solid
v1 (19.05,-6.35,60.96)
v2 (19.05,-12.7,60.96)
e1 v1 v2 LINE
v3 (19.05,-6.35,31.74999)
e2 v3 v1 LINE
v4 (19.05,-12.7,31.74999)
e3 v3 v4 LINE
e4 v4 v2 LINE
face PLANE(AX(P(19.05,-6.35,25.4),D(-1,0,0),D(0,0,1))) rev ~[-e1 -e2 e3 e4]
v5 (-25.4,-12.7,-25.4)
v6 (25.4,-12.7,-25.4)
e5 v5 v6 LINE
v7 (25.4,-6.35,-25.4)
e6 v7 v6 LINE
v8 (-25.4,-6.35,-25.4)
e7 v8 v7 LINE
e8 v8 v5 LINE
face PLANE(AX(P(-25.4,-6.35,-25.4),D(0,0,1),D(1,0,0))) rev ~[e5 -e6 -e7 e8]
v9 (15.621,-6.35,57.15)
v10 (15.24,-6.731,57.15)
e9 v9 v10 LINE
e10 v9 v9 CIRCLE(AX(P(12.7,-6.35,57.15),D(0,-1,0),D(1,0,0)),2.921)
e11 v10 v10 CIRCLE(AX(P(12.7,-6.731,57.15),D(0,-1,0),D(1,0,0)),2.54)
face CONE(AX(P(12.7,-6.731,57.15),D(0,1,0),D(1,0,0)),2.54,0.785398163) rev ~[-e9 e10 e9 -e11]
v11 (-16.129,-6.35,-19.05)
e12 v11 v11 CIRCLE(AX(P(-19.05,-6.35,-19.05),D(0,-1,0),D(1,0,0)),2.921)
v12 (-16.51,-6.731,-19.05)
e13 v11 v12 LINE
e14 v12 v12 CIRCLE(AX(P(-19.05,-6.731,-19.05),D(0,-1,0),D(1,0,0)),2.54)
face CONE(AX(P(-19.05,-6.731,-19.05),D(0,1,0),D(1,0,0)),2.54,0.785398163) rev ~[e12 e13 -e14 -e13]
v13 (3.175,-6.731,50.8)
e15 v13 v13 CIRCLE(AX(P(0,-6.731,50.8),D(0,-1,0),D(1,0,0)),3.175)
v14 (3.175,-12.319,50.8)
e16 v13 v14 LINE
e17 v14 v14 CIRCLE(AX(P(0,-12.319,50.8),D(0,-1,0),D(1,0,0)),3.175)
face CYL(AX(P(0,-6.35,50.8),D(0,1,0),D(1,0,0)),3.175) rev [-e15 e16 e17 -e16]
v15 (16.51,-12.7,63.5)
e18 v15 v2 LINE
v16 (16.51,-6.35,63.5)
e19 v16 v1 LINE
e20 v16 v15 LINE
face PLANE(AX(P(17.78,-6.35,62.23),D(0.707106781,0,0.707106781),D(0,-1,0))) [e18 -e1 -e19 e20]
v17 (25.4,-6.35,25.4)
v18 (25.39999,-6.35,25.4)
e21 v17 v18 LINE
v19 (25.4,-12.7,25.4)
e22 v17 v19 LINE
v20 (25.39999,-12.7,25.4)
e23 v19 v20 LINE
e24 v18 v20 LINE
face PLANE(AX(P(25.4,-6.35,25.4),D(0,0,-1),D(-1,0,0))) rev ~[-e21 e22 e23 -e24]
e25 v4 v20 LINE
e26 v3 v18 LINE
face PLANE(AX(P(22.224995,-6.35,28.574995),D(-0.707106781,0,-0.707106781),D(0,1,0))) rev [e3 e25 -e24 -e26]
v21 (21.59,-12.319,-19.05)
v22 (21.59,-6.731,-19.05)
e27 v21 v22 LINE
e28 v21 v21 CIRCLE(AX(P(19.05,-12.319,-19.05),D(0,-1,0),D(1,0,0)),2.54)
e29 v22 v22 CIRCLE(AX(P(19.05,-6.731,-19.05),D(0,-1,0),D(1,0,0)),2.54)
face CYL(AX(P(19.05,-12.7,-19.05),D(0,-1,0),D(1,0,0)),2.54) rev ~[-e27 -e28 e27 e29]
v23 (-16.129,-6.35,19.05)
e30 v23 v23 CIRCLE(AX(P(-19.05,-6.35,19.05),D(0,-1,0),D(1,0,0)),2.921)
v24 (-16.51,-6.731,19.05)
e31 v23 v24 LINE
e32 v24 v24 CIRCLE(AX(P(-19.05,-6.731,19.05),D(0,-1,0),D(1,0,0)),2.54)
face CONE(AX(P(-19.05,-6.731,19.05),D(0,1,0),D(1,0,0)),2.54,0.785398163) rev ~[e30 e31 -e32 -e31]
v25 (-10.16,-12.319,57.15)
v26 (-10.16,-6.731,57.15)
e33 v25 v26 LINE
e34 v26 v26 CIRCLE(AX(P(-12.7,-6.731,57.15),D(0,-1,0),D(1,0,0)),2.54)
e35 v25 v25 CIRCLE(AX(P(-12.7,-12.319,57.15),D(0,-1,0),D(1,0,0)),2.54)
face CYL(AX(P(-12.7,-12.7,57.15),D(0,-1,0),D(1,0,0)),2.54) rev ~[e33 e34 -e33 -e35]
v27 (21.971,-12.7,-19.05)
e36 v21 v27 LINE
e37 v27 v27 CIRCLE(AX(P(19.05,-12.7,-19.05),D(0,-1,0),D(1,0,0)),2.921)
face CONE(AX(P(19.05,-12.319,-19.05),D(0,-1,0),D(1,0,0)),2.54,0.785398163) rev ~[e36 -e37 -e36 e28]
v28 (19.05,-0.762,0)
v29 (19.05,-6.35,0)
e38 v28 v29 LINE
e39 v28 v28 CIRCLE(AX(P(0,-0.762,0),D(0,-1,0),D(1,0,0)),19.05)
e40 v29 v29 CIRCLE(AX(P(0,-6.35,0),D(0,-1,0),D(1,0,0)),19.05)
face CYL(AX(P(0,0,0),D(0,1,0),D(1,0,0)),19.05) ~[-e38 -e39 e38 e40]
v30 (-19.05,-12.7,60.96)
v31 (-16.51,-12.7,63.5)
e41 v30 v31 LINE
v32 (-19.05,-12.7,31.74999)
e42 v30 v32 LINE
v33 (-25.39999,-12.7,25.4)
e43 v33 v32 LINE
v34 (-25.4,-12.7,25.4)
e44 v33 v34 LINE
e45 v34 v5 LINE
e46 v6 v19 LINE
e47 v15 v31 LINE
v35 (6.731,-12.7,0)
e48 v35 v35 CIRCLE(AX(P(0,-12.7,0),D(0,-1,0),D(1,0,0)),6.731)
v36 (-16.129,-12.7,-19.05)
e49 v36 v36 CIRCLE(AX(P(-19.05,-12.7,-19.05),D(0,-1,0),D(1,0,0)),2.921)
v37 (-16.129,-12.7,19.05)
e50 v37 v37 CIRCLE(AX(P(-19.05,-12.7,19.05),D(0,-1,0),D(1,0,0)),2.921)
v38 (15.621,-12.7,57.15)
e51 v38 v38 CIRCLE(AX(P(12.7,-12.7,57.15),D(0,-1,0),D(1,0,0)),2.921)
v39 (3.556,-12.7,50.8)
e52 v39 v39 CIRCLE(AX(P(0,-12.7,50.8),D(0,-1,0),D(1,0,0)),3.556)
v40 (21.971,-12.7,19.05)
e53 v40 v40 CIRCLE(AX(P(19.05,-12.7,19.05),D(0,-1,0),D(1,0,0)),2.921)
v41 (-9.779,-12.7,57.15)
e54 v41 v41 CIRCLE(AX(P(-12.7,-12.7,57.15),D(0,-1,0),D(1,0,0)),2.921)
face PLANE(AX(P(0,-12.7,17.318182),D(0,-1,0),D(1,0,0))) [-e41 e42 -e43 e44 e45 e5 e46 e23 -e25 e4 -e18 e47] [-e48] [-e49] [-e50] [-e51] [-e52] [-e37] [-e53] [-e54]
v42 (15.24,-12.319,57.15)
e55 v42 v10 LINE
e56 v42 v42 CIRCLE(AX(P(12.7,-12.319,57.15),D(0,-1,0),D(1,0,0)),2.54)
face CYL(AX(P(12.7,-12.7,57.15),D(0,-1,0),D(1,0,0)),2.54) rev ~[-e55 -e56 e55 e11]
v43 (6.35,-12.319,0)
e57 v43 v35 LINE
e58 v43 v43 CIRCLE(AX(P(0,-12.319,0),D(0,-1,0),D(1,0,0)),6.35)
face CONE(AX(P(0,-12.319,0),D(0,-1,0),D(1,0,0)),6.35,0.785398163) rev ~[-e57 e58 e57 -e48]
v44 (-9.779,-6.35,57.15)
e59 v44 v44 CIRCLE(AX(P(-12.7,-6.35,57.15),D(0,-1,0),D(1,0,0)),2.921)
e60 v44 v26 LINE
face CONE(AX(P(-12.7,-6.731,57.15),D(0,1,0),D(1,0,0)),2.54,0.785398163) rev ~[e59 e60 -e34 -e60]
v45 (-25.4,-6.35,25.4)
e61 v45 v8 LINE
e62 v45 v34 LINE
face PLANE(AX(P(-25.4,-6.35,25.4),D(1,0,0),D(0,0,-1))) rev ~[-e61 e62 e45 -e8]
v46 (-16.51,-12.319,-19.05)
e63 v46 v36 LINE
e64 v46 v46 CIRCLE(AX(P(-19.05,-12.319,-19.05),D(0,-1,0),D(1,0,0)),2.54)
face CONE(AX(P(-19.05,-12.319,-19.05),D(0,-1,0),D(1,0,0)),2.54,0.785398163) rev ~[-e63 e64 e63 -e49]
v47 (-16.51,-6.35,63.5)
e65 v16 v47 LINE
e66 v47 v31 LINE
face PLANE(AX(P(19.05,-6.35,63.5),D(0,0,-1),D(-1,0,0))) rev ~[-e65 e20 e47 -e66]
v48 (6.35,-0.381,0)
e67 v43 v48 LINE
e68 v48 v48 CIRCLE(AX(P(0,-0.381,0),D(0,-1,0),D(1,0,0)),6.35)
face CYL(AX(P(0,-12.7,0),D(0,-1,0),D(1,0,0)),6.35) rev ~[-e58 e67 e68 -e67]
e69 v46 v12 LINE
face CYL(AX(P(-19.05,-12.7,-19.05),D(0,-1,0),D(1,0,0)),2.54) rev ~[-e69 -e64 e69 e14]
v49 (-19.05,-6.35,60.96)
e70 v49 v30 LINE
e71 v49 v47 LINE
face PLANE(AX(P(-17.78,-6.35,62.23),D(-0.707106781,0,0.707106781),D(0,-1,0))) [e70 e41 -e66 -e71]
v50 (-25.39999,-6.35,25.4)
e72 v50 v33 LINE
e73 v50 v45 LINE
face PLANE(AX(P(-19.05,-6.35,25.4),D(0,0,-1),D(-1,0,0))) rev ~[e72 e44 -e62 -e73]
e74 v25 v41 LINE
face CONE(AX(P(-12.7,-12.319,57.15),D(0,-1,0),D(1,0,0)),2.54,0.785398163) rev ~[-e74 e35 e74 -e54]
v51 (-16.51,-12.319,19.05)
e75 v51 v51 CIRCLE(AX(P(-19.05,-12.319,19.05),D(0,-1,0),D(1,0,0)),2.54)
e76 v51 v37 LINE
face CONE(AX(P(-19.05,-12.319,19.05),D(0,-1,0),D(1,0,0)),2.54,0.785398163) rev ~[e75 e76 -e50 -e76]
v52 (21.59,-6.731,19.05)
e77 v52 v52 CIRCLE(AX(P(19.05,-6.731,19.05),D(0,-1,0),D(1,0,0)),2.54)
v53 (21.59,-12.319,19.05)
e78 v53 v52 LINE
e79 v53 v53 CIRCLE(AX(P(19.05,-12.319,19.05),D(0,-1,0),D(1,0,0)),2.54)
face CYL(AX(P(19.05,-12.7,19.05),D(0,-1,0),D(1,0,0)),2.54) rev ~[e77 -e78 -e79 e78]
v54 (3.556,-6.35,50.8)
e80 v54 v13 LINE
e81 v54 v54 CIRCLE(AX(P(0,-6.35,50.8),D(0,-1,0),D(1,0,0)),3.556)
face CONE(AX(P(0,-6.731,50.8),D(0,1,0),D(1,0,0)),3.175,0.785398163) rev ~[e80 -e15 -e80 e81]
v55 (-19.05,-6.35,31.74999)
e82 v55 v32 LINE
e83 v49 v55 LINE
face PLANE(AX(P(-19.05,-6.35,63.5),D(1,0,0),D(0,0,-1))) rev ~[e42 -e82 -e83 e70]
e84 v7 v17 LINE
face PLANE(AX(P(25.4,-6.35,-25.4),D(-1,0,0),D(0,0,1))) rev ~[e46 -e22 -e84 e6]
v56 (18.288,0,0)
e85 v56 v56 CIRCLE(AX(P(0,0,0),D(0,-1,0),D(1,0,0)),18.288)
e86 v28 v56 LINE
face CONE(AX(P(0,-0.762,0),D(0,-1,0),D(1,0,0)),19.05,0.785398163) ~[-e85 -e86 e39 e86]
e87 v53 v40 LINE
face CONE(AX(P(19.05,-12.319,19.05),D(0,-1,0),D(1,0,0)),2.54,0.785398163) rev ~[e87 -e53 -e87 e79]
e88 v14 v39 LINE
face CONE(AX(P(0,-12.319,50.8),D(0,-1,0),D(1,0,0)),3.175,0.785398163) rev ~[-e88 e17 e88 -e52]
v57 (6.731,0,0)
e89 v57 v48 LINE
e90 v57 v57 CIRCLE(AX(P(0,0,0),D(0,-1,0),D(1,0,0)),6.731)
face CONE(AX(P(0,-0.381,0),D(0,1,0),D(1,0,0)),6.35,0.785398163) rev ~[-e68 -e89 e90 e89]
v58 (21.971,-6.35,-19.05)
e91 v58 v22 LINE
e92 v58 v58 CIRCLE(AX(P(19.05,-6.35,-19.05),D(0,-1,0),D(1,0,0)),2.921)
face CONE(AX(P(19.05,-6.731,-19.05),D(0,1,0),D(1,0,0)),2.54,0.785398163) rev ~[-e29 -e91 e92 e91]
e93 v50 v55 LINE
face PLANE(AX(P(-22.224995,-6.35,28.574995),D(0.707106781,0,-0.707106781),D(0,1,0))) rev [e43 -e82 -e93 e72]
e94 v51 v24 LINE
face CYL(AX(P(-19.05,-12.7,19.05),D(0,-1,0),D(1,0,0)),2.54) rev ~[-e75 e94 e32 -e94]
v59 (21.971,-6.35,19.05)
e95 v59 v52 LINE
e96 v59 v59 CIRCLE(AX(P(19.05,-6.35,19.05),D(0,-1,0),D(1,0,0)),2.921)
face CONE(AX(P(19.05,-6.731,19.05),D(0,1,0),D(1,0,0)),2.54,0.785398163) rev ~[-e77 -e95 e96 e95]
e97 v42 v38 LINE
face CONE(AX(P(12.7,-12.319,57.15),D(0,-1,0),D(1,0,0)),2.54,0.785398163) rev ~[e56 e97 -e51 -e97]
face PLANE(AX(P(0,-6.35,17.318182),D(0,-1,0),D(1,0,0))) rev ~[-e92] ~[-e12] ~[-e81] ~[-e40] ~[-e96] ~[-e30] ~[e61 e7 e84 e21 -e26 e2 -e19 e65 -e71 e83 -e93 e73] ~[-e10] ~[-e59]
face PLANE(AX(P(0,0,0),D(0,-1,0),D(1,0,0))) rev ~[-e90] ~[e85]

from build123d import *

# Parameters (mm, degrees)
F0_R     = 19.05
F1_DEPTH = 6.35
F2_R     = 3.175
F3_DEPTH = 6.35
F4_SIZE  = 0.762
F5_R     = 6.35
F5_R_2   = 2.54
F6_DEPTH = 12.7
F7_SIZE  = 0.381
F8_SIZE  = 6.34999
F9_SIZE  = 2.54


# Not quite as in the source:
# - a fillet or chamfer is up to 0.001 mm smaller than in the source, because OpenCascade refuses the exact size


with BuildPart() as f1:
    # F0 (on Front) → F1 (new body)
    with BuildSketch(Plane.XZ):
        Circle(F0_R)
    extrude(amount=F1_DEPTH)

    # F2 (on face) → F3 (join)
    with BuildSketch(Plane.XZ.offset(6.35)):
        Polygon((-19.05, 25.4), (-25.4, 25.4), (-25.4, -25.4), (25.4, -25.4), (25.4, 25.4), (19.05, 25.4), (19.05, 63.5), (-19.05, 63.5), align=None)
        with Locations((0, 50.8)):
            Circle(F2_R, mode=Mode.SUBTRACT)
    extrude(amount=F3_DEPTH)

    # F4
    f4_edges = [f1.edges().sort_by_distance(p)[0] for p in [
        (-19.05, 0, 0),
    ]]
    chamfer(f4_edges, length=F4_SIZE)

    # F5 (on face) → F6 (cut)
    with BuildSketch(Plane.XZ.offset(12.7)):
        Circle(F5_R)
        with Locations((-19.05, 19.05)):
            Circle(F5_R_2)
        with Locations((19.05, 19.05)):
            Circle(F5_R_2)
        with Locations((19.05, -19.05)):
            Circle(F5_R_2)
        with Locations((-19.05, -19.05)):
            Circle(F5_R_2)
        with Locations((-12.7, 57.15)):
            Circle(F5_R_2)
        with Locations((12.7, 57.15)):
            Circle(F5_R_2)
    extrude(amount=-F6_DEPTH, mode=Mode.SUBTRACT)

    # F7
    f7_edges = [f1.edges().sort_by_distance(p)[0] for p in [
        (-21.59, -12.7, 19.05),
        (16.51, -12.7, 19.05),
        (16.51, -12.7, -19.05),
        (-21.59, -12.7, -19.05),
        (-6.35, -12.7, 0),
        (-6.35, 0, 0),
        (16.51, -6.35, -19.05),
        (-21.59, -6.35, -19.05),
        (-21.59, -6.35, 19.05),
        (16.51, -6.35, 19.05),
        (-15.24, -12.7, 57.15),
        (10.16, -12.7, 57.15),
        (-15.24, -6.35, 57.15),
        (10.16, -6.35, 57.15),
        (-3.175, -6.35, 50.8),
        (-3.175, -12.7, 50.8),
    ]]
    chamfer(f7_edges, length=F7_SIZE)

    # F8 (size 6.35 in the source; OpenCascade refuses exactly that, so slightly less here)
    f8_edges = [f1.edges().sort_by_distance(p)[0] for p in [
        (-19.05, -9.525, 25.4),
        (19.05, -9.525, 25.4),
    ]]
    chamfer(f8_edges, length=F8_SIZE)

    # F9
    f9_edges = [f1.edges().sort_by_distance(p)[0] for p in [
        (-19.05, -9.525, 63.5),
        (19.05, -9.525, 63.5),
    ]]
    chamfer(f9_edges, length=F9_SIZE)


solid = f1.part
